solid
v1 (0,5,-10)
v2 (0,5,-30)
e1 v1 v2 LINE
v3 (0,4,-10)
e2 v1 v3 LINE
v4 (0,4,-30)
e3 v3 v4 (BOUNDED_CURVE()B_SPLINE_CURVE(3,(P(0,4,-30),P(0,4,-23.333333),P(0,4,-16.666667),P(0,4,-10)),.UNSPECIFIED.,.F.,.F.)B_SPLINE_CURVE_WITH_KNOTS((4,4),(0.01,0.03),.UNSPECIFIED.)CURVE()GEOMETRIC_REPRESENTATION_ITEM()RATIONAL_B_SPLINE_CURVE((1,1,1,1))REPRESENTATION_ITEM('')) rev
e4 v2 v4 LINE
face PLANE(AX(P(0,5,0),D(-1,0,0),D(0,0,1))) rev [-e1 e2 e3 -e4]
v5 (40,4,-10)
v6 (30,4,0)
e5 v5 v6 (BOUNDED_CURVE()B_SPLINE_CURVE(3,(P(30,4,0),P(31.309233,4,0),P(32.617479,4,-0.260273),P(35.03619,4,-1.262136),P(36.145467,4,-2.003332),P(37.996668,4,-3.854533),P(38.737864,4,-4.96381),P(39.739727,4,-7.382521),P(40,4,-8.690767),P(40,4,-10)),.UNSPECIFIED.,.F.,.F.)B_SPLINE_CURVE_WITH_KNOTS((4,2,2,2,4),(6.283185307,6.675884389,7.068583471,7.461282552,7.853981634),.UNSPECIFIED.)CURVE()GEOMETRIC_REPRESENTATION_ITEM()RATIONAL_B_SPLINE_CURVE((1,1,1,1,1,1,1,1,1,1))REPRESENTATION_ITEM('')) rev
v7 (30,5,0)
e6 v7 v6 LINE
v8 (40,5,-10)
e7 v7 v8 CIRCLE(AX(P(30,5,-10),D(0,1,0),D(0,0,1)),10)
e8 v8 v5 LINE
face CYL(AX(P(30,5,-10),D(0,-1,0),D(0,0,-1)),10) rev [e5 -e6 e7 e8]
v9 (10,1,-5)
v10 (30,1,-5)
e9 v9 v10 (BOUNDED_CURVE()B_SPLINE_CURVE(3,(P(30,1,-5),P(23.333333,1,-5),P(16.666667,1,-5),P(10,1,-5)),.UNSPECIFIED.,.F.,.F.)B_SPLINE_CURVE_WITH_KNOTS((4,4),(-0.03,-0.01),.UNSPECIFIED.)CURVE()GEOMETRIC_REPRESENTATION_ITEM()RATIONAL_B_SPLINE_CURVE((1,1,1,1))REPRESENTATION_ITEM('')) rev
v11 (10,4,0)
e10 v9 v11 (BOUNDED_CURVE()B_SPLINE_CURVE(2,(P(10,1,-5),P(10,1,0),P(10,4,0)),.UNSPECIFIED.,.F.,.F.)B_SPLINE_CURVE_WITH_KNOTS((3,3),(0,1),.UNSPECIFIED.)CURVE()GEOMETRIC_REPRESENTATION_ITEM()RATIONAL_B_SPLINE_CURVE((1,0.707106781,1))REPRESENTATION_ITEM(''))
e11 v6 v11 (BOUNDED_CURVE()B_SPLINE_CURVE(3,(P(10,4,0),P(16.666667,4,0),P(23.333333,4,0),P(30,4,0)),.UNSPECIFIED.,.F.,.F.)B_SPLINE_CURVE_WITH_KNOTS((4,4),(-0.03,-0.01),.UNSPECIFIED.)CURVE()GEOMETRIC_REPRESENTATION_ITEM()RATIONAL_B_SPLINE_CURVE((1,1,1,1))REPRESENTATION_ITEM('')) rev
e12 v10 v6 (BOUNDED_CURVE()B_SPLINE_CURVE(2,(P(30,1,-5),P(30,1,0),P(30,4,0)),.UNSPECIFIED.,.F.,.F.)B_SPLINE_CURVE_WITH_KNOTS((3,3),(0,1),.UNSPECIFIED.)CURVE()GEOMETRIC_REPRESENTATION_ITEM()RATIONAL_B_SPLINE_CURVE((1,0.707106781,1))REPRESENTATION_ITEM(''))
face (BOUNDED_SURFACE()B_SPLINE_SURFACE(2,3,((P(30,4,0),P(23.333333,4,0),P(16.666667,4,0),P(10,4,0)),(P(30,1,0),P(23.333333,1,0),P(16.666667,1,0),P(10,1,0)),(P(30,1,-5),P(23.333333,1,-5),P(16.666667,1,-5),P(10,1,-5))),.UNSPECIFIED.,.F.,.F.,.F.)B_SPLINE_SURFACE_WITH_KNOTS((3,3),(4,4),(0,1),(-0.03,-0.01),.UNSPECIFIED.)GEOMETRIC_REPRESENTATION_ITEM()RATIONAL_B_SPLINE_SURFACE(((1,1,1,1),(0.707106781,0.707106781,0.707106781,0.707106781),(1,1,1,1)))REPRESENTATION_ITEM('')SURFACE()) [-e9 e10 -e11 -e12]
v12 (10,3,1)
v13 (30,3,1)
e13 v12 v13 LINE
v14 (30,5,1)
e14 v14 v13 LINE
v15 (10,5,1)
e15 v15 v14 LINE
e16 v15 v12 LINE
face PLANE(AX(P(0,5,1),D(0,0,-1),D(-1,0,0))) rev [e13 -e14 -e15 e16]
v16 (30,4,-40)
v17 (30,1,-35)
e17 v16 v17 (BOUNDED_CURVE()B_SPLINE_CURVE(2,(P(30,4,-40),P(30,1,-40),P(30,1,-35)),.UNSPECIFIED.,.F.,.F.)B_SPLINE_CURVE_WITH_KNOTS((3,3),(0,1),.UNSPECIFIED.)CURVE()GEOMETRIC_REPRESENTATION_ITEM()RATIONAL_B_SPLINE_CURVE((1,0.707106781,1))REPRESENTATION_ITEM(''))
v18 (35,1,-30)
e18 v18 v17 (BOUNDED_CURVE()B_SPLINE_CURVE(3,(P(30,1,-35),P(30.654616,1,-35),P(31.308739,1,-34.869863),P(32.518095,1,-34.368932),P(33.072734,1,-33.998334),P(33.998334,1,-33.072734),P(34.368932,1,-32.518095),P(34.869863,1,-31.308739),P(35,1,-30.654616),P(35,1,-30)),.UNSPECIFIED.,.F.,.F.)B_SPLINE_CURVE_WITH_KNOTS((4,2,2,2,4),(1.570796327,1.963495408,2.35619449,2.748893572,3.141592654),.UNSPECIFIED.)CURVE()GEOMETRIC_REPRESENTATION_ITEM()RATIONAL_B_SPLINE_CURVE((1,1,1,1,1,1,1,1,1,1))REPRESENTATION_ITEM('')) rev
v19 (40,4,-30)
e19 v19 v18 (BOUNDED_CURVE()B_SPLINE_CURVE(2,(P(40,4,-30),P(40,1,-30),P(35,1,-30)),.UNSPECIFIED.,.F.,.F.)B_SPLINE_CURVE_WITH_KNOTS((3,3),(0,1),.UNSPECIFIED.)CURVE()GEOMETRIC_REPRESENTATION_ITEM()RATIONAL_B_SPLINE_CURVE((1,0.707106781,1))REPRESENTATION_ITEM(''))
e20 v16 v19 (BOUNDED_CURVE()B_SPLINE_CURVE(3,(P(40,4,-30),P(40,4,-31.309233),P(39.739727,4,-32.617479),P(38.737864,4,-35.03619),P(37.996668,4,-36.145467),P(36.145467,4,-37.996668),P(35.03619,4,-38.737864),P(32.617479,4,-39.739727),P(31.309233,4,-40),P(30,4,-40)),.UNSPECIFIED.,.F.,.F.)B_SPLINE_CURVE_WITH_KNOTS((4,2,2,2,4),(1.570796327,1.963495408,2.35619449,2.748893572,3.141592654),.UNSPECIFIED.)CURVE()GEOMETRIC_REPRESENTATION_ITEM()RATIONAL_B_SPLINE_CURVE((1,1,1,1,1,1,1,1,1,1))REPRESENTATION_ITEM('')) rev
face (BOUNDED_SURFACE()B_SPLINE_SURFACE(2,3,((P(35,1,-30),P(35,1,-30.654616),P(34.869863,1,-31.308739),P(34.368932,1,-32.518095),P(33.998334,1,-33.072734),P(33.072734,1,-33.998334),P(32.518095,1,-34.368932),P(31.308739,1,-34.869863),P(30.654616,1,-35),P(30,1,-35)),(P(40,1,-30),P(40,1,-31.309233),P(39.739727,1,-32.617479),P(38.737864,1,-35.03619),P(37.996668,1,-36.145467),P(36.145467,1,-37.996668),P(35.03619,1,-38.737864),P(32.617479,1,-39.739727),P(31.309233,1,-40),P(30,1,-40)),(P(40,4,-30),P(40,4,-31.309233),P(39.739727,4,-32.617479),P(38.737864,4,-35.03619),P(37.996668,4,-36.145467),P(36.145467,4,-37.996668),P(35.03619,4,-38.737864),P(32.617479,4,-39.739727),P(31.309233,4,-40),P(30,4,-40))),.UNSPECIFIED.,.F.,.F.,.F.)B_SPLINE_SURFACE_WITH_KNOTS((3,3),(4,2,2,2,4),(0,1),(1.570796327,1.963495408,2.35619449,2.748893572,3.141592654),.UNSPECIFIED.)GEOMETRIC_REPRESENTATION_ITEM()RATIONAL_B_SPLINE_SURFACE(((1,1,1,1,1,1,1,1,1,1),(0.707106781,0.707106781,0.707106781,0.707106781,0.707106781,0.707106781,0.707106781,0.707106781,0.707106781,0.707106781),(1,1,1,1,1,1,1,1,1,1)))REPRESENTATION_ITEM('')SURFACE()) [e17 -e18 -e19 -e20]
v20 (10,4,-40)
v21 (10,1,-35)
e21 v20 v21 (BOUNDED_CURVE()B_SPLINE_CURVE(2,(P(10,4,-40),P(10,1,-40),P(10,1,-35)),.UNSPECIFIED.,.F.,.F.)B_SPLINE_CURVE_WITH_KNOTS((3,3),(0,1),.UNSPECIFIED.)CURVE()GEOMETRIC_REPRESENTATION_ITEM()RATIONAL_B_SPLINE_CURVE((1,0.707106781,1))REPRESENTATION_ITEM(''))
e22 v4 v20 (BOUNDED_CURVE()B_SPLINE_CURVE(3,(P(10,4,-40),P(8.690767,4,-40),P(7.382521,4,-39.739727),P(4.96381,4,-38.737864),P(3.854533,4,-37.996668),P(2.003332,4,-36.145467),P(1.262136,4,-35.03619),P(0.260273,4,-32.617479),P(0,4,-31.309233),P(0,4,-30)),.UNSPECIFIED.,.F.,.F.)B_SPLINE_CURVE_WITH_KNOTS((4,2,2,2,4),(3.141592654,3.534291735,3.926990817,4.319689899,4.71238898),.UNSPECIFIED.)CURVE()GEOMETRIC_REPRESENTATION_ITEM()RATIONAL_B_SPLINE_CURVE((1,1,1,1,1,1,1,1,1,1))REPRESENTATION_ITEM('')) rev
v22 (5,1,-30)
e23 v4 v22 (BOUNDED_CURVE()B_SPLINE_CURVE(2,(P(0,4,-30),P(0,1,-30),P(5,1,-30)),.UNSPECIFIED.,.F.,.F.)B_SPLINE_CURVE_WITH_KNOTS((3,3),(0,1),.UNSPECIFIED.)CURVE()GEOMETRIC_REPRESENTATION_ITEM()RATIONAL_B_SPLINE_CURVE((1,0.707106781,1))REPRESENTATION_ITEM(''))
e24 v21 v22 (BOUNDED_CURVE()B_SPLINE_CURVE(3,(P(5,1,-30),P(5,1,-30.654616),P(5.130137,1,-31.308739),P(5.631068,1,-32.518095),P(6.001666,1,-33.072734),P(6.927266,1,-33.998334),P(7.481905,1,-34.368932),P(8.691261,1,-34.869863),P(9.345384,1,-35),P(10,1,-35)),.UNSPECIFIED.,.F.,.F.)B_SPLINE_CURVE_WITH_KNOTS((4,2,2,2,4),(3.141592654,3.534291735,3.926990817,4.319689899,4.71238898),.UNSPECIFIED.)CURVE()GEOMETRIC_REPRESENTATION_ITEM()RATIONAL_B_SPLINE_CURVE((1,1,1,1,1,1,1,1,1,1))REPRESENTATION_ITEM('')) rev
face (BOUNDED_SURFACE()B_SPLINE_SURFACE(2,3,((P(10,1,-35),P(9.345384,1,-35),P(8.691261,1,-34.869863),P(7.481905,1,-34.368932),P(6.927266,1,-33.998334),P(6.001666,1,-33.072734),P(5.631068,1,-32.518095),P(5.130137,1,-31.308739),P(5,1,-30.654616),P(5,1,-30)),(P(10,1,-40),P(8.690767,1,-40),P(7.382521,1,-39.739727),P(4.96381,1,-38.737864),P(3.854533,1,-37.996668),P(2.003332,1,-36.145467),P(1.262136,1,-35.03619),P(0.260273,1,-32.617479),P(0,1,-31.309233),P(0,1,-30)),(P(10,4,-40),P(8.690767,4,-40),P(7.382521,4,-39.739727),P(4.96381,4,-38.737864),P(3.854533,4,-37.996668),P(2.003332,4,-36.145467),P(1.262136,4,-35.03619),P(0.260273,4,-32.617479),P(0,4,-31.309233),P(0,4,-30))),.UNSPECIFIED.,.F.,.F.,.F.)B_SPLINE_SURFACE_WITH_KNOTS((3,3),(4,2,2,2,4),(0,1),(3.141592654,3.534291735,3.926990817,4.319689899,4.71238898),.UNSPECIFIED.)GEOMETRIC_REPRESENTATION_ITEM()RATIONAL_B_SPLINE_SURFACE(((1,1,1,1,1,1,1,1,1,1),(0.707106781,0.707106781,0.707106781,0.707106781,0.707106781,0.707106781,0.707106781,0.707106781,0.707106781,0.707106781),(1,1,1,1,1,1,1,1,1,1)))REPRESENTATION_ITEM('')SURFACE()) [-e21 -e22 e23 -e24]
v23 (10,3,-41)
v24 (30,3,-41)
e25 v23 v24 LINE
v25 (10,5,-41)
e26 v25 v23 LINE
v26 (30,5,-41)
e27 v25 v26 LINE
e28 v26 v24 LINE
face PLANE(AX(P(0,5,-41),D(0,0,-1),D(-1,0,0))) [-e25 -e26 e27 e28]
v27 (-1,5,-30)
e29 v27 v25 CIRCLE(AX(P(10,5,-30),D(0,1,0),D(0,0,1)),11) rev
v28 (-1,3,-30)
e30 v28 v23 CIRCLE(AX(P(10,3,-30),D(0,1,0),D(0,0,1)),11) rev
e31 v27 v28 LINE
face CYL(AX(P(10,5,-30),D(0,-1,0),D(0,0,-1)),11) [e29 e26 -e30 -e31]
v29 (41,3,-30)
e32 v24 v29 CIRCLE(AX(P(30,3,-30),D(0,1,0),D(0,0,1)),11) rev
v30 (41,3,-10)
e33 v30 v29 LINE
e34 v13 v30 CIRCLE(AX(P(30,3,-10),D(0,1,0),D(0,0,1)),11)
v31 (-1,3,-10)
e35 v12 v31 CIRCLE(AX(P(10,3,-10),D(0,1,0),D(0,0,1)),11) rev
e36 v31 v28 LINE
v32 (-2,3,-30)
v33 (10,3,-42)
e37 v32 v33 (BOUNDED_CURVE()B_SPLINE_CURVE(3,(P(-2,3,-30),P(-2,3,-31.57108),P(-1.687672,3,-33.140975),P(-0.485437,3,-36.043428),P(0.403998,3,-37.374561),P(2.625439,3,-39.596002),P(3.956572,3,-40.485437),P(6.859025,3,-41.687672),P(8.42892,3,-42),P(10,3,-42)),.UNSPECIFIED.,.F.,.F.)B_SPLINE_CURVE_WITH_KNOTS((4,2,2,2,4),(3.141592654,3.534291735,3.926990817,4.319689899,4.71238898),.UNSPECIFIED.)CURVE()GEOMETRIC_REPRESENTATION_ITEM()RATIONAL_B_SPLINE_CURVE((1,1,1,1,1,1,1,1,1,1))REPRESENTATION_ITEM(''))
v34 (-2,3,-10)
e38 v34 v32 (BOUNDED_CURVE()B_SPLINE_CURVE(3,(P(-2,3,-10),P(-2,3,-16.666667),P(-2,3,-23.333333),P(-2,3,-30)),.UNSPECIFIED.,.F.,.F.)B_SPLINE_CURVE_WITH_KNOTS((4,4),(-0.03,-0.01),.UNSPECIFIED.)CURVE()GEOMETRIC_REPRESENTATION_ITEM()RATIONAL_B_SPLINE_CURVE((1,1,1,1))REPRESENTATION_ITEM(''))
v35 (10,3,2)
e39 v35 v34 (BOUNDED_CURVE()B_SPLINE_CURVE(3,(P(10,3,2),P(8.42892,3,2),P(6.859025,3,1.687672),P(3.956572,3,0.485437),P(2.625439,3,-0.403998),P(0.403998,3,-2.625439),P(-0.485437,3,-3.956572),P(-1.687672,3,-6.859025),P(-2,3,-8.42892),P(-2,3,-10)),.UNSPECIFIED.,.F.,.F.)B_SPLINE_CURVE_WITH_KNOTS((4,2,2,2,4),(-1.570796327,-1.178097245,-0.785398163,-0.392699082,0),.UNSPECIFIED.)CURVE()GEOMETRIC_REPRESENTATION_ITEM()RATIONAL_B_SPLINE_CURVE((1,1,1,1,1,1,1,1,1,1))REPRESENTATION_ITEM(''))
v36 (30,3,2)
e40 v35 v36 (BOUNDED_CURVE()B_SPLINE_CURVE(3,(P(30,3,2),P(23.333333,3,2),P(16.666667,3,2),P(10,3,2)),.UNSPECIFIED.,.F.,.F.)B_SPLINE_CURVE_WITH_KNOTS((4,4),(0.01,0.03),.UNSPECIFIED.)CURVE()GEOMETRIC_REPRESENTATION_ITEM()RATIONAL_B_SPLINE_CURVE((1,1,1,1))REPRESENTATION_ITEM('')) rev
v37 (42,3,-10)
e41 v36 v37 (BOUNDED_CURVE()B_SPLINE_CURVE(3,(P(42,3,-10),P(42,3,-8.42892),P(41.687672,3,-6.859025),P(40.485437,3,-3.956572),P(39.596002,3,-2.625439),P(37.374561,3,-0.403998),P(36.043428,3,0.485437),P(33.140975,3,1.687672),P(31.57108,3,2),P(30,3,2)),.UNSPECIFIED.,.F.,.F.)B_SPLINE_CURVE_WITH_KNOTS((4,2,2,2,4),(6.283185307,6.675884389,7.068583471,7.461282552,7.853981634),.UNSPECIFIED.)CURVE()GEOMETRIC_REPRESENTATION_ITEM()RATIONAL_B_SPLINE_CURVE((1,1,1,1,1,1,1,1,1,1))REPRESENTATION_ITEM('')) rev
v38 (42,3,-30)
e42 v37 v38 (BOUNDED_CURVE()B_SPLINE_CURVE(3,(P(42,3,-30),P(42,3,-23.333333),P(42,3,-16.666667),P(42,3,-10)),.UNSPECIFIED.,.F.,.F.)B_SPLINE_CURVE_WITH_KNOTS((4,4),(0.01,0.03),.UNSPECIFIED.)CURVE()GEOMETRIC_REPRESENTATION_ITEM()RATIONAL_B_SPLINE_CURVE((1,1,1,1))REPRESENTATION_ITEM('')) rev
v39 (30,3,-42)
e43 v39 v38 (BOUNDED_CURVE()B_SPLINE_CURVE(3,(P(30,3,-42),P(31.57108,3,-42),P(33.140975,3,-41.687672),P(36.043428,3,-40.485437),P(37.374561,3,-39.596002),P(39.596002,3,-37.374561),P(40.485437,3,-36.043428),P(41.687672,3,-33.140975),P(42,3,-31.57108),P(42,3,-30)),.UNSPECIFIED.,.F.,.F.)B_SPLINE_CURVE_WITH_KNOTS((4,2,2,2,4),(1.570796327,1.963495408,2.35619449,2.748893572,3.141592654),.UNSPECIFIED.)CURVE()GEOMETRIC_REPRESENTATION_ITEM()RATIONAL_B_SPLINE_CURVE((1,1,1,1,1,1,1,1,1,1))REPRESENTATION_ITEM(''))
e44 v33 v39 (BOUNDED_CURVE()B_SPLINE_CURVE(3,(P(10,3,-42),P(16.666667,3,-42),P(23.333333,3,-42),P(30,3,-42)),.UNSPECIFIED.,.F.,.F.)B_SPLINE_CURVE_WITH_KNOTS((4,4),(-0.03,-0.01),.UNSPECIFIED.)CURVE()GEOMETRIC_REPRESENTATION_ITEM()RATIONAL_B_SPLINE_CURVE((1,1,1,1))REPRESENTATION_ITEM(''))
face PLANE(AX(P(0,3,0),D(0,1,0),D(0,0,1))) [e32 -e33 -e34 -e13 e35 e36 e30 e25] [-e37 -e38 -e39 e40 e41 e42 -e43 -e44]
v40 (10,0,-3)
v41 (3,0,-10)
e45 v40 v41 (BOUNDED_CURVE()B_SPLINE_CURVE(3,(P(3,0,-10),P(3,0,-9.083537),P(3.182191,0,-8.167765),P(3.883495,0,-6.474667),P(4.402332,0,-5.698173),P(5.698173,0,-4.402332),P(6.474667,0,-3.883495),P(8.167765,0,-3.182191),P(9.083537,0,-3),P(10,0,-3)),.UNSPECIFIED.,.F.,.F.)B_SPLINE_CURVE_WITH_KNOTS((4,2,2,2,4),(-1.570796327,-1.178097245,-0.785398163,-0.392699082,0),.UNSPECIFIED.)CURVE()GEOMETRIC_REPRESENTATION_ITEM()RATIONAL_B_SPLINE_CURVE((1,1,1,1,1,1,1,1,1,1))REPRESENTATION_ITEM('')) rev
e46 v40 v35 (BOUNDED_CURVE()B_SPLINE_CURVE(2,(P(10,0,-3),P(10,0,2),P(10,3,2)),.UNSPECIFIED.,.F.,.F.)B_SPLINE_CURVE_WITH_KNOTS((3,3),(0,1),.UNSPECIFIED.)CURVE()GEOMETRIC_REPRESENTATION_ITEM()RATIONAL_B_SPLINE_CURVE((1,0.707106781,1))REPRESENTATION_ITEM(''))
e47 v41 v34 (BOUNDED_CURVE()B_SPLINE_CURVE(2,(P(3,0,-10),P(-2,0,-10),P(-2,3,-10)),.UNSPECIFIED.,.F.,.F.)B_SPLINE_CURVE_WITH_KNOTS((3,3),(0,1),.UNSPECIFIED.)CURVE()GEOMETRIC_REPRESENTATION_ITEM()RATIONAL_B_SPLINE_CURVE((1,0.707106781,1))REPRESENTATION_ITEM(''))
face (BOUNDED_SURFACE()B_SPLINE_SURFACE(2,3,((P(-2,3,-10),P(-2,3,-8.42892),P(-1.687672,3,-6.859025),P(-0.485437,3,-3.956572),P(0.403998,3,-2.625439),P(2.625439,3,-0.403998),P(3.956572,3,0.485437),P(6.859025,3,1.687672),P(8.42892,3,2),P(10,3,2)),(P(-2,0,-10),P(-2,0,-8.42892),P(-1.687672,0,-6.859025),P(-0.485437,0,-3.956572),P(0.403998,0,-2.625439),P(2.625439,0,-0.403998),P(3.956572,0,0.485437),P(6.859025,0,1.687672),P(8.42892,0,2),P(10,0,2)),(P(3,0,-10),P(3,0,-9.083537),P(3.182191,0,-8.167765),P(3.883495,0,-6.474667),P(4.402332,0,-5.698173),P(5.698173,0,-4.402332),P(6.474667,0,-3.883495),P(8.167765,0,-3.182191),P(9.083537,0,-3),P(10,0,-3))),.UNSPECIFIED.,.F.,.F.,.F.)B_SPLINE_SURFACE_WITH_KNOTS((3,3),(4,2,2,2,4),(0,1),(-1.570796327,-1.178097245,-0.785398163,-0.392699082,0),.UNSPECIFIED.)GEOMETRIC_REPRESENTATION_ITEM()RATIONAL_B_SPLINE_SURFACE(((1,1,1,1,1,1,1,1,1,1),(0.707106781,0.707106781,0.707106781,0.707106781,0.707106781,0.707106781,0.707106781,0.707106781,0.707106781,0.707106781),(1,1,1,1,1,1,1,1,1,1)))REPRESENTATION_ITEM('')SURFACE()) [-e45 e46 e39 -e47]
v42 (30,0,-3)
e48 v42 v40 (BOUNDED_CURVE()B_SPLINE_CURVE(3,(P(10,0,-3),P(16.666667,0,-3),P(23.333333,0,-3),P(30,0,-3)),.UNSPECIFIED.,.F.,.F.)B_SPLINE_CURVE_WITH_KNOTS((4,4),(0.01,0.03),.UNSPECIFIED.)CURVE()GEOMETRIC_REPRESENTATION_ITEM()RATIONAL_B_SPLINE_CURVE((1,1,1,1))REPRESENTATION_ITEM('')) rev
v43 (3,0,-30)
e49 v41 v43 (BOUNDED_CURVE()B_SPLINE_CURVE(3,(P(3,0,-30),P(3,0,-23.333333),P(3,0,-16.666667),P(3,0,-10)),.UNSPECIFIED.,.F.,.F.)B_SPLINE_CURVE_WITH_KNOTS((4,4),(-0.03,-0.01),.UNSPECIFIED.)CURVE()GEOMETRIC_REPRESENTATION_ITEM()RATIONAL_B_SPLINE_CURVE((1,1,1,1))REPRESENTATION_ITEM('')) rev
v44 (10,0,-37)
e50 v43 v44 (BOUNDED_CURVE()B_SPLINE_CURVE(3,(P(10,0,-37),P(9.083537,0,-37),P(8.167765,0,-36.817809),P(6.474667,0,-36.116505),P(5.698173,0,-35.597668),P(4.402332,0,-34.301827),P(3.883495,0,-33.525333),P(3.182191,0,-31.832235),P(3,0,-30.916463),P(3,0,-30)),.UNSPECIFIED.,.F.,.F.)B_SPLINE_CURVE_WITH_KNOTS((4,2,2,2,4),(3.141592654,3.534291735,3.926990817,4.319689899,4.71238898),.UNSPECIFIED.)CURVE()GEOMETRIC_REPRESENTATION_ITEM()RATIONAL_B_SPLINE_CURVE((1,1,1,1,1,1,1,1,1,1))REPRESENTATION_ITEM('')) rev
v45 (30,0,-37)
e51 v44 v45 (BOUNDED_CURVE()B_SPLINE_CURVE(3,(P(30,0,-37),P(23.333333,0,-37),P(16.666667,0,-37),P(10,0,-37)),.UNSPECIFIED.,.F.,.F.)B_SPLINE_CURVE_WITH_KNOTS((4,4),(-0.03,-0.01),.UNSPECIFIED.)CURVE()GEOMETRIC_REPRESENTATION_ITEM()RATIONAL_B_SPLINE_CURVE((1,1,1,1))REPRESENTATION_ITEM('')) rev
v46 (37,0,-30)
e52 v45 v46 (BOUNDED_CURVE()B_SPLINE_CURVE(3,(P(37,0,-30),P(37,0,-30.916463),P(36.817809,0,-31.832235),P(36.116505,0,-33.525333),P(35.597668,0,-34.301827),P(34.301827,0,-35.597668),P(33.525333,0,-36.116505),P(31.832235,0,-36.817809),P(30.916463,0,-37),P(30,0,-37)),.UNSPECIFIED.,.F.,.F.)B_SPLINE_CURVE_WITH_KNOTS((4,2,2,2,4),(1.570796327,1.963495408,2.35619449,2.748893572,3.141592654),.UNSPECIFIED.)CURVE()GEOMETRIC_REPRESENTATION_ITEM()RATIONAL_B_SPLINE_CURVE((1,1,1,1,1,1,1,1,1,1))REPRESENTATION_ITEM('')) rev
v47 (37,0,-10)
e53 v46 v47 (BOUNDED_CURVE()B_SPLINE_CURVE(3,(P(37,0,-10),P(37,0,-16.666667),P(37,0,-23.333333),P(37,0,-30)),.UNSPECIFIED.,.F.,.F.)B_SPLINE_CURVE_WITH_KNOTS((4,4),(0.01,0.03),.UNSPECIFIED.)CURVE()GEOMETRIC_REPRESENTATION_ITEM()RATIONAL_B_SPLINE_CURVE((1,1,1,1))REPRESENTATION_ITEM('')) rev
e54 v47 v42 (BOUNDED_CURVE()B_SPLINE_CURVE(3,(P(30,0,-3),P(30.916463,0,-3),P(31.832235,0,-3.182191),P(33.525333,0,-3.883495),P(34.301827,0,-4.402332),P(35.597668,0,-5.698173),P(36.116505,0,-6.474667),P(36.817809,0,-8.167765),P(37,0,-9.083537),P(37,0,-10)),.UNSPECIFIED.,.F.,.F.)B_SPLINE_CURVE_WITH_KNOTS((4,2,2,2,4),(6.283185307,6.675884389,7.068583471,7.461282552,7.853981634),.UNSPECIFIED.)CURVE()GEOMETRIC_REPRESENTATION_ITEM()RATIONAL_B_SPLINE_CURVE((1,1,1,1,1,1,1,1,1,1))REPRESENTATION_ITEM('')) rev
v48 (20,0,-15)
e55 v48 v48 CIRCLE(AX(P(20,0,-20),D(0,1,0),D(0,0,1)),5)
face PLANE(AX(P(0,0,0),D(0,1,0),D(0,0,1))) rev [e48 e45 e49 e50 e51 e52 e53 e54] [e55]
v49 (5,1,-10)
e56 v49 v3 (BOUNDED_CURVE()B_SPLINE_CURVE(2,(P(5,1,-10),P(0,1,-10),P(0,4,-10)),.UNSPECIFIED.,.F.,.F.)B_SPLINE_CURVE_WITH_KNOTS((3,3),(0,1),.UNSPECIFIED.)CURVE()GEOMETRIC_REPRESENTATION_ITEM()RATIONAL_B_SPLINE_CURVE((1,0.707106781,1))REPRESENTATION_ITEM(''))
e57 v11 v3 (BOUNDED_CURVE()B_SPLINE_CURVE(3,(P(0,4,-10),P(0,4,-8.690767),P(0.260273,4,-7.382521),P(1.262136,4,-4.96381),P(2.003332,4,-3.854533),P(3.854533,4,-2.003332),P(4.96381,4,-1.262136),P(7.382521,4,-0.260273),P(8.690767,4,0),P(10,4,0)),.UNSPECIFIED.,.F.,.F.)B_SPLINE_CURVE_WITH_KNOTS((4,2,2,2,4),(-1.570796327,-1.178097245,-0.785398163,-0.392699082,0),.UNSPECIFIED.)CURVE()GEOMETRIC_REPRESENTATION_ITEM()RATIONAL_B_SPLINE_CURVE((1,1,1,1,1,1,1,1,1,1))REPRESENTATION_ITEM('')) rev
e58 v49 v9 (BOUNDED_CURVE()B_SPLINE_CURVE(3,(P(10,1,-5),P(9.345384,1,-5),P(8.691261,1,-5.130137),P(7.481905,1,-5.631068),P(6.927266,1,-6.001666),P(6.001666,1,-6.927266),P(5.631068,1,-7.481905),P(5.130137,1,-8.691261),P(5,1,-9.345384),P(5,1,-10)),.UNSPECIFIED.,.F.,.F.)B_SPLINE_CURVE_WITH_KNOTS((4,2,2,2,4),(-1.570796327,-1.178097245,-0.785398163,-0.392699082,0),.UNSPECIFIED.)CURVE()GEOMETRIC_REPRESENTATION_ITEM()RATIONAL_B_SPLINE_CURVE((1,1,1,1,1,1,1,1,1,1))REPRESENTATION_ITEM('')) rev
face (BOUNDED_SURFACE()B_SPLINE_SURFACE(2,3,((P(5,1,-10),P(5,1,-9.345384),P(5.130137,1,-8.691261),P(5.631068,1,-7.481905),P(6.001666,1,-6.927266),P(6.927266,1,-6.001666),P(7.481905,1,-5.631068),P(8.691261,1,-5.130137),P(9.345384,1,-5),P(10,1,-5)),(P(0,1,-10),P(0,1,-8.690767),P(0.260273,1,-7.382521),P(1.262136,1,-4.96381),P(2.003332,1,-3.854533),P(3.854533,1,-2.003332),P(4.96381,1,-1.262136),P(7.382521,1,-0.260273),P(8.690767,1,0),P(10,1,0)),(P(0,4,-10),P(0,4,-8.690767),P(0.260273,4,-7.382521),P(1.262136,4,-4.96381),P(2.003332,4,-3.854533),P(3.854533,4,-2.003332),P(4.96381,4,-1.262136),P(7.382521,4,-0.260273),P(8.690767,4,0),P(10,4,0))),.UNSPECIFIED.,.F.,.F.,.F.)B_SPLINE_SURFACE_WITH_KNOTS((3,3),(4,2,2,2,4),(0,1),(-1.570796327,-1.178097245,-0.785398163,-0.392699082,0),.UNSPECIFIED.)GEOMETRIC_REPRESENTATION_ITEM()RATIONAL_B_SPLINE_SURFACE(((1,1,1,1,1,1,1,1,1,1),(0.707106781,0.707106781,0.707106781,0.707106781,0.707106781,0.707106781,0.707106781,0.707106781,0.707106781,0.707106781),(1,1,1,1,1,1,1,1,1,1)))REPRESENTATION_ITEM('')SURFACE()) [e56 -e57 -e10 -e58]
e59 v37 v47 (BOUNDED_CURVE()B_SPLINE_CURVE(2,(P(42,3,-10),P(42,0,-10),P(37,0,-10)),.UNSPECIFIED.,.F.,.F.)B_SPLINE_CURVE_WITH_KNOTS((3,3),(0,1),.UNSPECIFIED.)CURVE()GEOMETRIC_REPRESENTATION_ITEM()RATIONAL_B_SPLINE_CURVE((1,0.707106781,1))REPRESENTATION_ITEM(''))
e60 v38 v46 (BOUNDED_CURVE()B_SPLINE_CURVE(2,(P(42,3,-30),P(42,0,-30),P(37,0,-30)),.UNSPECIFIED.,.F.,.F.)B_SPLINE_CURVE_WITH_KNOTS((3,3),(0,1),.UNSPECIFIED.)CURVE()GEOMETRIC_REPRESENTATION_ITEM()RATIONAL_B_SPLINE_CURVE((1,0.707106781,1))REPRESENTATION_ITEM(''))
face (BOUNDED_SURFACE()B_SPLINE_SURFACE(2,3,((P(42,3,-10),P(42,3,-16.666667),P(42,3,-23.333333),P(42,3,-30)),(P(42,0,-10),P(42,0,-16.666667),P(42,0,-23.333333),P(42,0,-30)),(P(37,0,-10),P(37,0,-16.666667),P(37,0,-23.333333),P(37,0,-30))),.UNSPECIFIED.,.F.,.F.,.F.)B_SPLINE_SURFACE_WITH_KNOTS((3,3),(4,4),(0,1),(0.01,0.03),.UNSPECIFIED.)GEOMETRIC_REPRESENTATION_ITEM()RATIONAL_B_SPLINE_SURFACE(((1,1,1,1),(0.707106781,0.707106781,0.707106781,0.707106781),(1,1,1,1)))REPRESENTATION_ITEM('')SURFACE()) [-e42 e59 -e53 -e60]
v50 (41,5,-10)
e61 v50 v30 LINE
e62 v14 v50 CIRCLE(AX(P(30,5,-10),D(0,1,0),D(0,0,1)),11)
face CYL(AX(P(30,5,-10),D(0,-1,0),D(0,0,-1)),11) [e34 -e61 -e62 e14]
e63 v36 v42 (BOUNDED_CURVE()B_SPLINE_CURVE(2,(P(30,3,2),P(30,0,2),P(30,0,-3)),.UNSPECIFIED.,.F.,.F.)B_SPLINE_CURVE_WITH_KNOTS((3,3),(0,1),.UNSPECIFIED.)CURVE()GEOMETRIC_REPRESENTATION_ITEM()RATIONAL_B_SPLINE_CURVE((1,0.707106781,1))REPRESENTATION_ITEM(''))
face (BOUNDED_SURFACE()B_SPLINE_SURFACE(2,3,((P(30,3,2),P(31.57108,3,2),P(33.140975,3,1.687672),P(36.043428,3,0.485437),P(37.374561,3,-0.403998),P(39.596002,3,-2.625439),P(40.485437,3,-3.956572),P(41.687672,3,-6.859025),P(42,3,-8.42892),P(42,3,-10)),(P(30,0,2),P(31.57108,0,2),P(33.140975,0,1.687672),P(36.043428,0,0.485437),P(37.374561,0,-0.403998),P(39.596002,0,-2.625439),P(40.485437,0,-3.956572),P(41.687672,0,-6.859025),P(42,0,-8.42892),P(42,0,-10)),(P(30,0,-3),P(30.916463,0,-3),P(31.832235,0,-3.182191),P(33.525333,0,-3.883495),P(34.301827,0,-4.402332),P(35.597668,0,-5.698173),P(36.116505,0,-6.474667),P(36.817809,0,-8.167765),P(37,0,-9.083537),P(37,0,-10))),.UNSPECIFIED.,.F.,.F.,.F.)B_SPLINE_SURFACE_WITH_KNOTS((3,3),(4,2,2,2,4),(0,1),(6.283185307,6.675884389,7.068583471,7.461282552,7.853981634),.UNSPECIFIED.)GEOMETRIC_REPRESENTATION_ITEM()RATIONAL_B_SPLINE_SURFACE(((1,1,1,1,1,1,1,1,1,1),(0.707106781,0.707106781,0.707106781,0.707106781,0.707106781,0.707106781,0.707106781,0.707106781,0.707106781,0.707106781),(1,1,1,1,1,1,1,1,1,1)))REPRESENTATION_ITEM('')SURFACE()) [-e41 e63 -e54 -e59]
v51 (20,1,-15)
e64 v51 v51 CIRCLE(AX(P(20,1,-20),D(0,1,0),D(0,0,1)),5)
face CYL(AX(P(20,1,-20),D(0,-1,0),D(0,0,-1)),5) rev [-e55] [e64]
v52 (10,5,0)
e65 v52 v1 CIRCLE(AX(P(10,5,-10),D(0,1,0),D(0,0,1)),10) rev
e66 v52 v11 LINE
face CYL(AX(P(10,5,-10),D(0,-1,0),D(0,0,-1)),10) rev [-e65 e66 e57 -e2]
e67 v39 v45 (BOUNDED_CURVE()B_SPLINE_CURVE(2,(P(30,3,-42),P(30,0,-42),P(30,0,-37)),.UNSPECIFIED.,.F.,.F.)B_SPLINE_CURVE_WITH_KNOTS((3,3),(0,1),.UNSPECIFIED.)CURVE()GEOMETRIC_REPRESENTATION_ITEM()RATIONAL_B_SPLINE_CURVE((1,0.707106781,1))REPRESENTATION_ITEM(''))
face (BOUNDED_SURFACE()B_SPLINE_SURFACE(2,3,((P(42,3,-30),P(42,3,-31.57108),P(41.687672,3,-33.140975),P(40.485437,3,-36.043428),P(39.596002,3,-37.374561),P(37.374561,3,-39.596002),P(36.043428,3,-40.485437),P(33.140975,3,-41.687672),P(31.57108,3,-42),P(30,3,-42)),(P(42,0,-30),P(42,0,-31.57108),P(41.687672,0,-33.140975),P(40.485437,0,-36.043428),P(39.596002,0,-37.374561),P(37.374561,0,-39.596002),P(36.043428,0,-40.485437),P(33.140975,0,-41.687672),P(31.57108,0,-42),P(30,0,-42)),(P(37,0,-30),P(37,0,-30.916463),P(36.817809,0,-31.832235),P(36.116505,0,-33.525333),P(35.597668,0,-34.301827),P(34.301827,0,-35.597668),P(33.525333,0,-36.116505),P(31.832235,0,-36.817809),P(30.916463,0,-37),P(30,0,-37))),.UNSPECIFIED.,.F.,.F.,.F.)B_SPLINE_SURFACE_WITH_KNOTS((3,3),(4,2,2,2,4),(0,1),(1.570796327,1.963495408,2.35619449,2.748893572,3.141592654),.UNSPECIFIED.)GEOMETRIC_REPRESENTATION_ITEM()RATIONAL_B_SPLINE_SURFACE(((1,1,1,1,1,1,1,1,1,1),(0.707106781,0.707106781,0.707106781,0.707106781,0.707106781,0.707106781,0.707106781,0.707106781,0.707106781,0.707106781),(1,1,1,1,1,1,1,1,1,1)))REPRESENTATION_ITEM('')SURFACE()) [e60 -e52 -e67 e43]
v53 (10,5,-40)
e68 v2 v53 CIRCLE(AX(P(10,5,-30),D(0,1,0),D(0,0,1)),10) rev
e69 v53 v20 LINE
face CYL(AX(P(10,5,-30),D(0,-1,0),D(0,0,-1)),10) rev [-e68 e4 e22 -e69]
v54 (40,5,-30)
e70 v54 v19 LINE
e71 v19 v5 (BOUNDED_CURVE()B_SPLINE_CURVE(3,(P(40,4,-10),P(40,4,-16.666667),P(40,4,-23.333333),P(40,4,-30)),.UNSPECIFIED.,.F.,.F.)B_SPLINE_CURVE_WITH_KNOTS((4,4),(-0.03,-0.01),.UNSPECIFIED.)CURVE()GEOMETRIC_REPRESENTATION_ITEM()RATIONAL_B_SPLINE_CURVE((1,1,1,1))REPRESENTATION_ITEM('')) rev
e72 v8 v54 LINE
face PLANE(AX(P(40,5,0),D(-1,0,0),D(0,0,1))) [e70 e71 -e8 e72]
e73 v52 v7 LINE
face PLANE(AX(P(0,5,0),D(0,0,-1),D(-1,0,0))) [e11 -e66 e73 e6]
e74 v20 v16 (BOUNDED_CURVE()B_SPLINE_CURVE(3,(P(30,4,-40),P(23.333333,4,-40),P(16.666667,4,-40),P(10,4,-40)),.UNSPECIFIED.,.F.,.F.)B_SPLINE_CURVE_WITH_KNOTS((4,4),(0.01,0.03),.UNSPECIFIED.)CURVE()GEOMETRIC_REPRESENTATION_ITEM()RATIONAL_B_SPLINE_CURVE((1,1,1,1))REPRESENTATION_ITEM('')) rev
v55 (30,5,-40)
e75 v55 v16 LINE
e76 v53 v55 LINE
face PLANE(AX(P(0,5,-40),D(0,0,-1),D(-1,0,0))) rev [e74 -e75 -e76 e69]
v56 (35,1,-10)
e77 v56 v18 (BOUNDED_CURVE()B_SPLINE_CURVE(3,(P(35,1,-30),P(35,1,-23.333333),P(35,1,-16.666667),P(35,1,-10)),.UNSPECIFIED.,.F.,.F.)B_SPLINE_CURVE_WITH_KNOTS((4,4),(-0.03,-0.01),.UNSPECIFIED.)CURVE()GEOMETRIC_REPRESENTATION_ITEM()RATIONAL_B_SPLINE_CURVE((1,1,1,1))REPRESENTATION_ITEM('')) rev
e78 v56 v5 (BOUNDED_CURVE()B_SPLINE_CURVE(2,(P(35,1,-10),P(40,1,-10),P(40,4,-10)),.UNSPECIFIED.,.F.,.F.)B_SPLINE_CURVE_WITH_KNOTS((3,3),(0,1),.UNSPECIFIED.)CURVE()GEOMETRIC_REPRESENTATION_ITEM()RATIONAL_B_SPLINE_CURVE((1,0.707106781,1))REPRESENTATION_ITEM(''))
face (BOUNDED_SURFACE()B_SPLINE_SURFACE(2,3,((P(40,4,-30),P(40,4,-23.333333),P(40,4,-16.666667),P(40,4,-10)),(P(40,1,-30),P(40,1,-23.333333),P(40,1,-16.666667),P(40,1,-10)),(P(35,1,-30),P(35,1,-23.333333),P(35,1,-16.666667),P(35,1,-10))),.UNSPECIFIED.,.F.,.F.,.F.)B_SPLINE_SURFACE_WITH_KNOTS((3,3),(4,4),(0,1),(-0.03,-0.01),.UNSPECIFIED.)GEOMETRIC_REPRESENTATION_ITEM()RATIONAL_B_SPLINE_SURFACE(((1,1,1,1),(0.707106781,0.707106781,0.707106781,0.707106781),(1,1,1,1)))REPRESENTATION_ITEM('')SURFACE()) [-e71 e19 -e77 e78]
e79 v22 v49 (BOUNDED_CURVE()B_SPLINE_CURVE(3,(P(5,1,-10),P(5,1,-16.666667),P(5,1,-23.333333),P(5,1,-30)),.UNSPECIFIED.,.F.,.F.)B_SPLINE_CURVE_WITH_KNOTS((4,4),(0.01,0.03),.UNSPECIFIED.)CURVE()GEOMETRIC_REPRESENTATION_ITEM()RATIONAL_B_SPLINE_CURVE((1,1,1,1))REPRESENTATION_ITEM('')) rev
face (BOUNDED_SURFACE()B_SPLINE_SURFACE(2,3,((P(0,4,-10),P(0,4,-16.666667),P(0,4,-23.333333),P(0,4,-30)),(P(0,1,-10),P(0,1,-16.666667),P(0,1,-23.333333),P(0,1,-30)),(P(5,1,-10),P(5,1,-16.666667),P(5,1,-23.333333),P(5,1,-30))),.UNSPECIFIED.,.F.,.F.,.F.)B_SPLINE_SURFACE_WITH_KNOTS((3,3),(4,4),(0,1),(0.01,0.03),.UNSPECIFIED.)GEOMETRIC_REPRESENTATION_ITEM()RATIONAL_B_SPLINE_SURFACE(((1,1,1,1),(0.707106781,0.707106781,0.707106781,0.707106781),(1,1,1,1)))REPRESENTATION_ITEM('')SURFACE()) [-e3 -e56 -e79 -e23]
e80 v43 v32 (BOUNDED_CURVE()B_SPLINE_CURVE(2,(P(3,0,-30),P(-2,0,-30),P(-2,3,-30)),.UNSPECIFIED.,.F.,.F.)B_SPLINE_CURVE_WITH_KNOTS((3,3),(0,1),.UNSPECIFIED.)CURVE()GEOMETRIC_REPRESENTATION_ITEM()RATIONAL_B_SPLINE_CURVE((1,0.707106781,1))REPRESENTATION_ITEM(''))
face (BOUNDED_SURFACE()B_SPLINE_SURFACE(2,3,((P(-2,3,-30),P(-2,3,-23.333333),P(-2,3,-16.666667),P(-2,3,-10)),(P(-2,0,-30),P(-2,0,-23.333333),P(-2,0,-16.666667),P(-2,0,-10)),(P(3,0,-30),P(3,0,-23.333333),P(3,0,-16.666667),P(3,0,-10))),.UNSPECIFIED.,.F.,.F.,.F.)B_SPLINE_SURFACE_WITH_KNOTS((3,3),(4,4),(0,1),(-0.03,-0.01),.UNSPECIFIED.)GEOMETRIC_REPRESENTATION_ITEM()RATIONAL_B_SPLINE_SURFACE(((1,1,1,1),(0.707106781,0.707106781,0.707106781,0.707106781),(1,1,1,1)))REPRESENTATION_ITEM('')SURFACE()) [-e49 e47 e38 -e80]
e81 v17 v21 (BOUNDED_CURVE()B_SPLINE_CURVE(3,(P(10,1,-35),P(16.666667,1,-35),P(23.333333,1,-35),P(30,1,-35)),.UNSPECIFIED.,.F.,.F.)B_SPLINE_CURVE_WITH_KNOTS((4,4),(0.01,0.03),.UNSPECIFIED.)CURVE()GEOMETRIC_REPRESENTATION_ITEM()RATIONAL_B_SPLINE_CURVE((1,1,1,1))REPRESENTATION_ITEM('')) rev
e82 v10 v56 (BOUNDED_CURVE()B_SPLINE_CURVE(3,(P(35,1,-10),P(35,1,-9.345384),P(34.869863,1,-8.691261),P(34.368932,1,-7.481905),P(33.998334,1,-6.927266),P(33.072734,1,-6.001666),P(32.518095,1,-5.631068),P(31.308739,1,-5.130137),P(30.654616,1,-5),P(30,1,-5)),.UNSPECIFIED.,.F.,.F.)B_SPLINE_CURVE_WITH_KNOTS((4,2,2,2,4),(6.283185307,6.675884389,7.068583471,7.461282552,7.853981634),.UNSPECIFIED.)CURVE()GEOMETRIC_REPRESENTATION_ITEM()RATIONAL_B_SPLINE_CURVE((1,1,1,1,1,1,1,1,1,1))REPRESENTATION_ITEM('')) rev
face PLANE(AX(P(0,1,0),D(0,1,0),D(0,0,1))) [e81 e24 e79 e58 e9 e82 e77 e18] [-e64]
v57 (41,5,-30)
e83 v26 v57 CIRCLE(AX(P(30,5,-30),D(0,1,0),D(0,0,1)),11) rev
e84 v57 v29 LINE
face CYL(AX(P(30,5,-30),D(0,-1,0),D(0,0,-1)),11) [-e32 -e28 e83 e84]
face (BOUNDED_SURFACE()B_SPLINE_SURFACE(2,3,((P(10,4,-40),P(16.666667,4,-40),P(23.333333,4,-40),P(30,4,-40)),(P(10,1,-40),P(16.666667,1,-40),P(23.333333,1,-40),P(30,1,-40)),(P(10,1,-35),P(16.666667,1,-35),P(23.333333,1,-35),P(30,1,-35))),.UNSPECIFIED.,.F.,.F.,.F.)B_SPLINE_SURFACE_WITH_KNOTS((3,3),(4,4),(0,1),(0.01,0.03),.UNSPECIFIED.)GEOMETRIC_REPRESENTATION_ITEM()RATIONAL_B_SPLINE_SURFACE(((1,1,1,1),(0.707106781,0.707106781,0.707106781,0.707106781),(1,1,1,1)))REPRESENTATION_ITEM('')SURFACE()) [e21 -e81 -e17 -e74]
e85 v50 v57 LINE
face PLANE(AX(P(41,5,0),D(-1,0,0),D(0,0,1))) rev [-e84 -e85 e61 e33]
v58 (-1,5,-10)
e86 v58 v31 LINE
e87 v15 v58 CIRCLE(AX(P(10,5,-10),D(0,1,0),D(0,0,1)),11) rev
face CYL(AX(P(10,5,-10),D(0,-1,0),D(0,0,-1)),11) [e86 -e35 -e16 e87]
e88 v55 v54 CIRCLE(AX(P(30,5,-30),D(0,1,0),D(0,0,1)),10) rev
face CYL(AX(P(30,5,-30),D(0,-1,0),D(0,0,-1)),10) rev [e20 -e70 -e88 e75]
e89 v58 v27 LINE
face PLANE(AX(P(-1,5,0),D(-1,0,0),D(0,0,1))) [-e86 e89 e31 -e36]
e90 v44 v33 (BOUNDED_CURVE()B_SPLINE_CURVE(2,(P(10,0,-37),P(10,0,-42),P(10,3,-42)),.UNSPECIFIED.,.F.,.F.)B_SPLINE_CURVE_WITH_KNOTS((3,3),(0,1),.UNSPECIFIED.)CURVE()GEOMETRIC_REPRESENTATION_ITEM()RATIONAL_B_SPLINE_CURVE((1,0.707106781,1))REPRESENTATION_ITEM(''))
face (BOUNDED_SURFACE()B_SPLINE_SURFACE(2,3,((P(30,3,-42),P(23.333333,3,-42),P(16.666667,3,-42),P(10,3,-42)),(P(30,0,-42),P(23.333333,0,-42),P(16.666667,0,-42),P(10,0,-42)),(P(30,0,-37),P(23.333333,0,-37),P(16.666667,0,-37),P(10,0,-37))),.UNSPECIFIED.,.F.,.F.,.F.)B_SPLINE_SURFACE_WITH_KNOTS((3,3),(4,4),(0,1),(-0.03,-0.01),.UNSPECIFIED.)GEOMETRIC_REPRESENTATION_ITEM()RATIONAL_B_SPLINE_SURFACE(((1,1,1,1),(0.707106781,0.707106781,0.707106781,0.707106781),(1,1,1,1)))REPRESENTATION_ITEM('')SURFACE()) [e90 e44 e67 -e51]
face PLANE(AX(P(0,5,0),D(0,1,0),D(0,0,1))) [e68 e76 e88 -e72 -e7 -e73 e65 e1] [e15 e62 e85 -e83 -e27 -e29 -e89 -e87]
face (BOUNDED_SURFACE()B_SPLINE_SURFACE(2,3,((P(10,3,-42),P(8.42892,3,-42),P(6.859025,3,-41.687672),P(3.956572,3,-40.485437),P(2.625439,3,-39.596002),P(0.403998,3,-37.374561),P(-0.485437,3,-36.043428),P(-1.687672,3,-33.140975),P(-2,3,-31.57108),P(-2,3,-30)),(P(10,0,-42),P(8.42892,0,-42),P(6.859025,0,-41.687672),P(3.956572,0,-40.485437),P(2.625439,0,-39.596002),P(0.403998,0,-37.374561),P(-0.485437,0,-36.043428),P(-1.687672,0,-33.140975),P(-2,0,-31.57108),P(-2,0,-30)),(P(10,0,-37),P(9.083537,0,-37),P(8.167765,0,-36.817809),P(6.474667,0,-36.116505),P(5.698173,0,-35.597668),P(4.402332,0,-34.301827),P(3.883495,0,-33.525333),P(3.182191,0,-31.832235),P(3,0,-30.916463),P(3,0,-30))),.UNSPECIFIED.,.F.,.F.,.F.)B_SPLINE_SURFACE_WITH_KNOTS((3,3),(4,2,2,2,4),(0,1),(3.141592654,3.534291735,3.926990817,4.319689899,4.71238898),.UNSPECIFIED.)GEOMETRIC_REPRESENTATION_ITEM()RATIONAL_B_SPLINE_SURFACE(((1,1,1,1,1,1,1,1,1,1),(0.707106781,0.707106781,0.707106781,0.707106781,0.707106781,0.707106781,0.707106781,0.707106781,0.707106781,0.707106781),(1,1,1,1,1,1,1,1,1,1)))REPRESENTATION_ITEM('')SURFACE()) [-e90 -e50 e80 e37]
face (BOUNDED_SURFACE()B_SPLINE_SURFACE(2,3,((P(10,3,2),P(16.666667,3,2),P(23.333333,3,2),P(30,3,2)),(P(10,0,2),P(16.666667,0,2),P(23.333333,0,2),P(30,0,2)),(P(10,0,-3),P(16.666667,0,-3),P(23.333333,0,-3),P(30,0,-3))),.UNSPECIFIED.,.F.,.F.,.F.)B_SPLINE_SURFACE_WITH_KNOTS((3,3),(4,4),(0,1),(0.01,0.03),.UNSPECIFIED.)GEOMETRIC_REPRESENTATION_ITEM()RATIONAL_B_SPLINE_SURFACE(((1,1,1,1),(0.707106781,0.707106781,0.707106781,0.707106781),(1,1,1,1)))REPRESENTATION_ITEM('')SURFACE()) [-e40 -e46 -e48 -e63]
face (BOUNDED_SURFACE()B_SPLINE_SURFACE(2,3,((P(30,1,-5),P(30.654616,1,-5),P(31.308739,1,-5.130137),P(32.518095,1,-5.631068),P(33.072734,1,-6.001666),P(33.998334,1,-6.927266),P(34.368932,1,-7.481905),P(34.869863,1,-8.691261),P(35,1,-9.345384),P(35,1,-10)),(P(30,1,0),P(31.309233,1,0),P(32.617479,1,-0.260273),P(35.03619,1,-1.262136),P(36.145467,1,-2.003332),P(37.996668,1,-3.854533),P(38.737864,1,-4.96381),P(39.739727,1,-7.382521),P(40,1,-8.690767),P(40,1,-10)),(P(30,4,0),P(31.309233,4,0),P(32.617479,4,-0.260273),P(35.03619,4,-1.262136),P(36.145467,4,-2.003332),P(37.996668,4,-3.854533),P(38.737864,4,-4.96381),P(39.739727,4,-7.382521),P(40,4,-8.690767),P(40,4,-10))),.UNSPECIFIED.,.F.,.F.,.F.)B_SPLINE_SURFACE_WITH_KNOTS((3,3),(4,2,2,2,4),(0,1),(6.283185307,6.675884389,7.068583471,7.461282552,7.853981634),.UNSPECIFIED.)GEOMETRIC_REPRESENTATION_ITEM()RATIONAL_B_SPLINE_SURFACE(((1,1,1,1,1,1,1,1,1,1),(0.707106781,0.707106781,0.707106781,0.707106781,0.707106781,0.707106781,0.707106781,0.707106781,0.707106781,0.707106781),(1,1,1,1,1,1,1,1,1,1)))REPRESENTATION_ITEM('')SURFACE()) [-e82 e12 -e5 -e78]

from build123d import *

# Parameters (mm, degrees)
SKETCH1_R           = 5
BOSS_EXTRUDE2_DEPTH = 1
BOSS_EXTRUDE3_DEPTH = 5
BOSS_EXTRUDE4_DEPTH = 3
FILLET1_SIZE        = 5
FILLET1_SIZE_2      = 3
FILLET2_SIZE        = 5
FILLET2_SIZE_2      = 3


with BuildPart() as part:
    # Sketch1 → Boss-Extrude2 (new body)
    with BuildSketch(Plane(origin=(0, 0, 0), x_dir=(1, 0, 0), z_dir=(0, 1, 0))):
        with BuildLine():
            ThreePointArc((10, 0), (2.928932188, 2.928932188), (0, 10))
            Line((0, 10), (0, 30))
            ThreePointArc((0, 30), (2.928932188, 37.071067812), (10, 40))
            Line((10, 40), (30, 40))
            ThreePointArc((30, 40), (37.071067812, 37.071067812), (40, 30))
            Line((40, 30), (40, 10))
            ThreePointArc((40, 10), (37.071067812, 2.928932188), (30, 0))
            Line((30, 0), (10, 0))
        make_face()
        with Locations(Location((20, 20, 0), (0, 0, 270))):
            Circle(SKETCH1_R, mode=Mode.SUBTRACT)
    extrude(amount=BOSS_EXTRUDE2_DEPTH)

    # Sketch1<4> → Boss-Extrude3 (add)
    with BuildSketch(Plane(origin=(0, 0, 0), x_dir=(1, 0, 0), z_dir=(0, 1, 0))):
        with BuildLine():
            ThreePointArc((10, -1), (2.221825407, 2.221825407), (-1, 10))
            Line((-1, 10), (-1, 30))
            ThreePointArc((-1, 30), (2.221825407, 37.778174593), (10, 41))
            Line((10, 41), (30, 41))
            ThreePointArc((30, 41), (37.778174593, 37.778174593), (41, 30))
            Line((41, 30), (41, 10))
            ThreePointArc((41, 10), (37.778174593, 2.221825407), (30, -1))
            Line((30, -1), (10, -1))
        make_face()
        with BuildLine():
            Line((10, 0), (30, 0))
            ThreePointArc((30, 0), (37.071067812, 2.928932188), (40, 10))
            Line((40, 10), (40, 30))
            ThreePointArc((40, 30), (37.071067812, 37.071067812), (30, 40))
            Line((30, 40), (10, 40))
            ThreePointArc((10, 40), (2.928932188, 37.071067812), (0, 30))
            Line((0, 30), (0, 10))
            ThreePointArc((0, 10), (2.928932188, 2.928932188), (10, 0))
        make_face(mode=Mode.SUBTRACT)
    extrude(amount=BOSS_EXTRUDE3_DEPTH)

    # Sketch1<5> → Boss-Extrude4 (add)
    with BuildSketch(Plane(origin=(0, 0, 0), x_dir=(1, 0, 0), z_dir=(0, 1, 0))):
        with BuildLine():
            ThreePointArc((10, -2), (1.514718626, 1.514718626), (-2, 10))
            Line((-2, 10), (-2, 30))
            ThreePointArc((-2, 30), (1.514718626, 38.485281374), (10, 42))
            Line((10, 42), (30, 42))
            ThreePointArc((30, 42), (38.485281374, 38.485281374), (42, 30))
            Line((42, 30), (42, 10))
            ThreePointArc((42, 10), (38.485281374, 1.514718626), (30, -2))
            Line((30, -2), (10, -2))
        make_face()
        with BuildLine():
            Line((10, -1), (30, -1))
            ThreePointArc((30, -1), (37.778174593, 2.221825407), (41, 10))
            Line((41, 10), (41, 30))
            ThreePointArc((41, 30), (37.778174593, 37.778174593), (30, 41))
            Line((30, 41), (10, 41))
            ThreePointArc((10, 41), (2.221825407, 37.778174593), (-1, 30))
            Line((-1, 30), (-1, 10))
            ThreePointArc((-1, 10), (2.221825407, 2.221825407), (10, -1))
        make_face(mode=Mode.SUBTRACT)
    extrude(amount=BOSS_EXTRUDE4_DEPTH)

    # Fillet1
    # an asymmetric fillet: 5, 3 mm, written as the material it adds along each edge
    with BuildSketch(Plane(origin=(10, 1, -10), x_dir=(0, 0, 1), z_dir=(1, 0, 0))) as fillet1_piece_1:
        with BuildLine():
            Bezier((10 - FILLET1_SIZE, 0), (10, 0), (10, -FILLET1_SIZE_2), weights=[1, 0.707106781, 1])
            Line((10, -FILLET1_SIZE_2), (10, 0))
            Line((10, 0), (10 - FILLET1_SIZE, 0))
        make_face()
    revolve(axis=Axis((10, 1, -10), (0, -1, 0)), revolution_arc=90)
    with BuildSketch(Plane(origin=(30, 1, 0), x_dir=(0, 0, -1), z_dir=(-1, 0, 0)), Plane(origin=(40, 1, -30), x_dir=(-1, 0, 0), z_dir=(0, 0, 1)), Plane(origin=(10, 1, -40), x_dir=(0, 0, 1), z_dir=(1, 0, 0)), Plane(origin=(0, 1, -10), x_dir=(1, 0, 0), z_dir=(0, 0, -1))) as fillet1_piece_2:
        with BuildLine():
            Bezier((FILLET1_SIZE, 0), (0, 0), (0, -FILLET1_SIZE_2), weights=[1, 0.707106781, 1])
            Line((0, -FILLET1_SIZE_2), (0, 0))
            Line((0, 0), (FILLET1_SIZE, 0))
        make_face()
    extrude(amount=20)
    with BuildSketch(Plane(origin=(30, 1, -10), x_dir=(1, 0, 0), z_dir=(0, 0, -1))) as fillet1_piece_3:
        with BuildLine():
            Bezier((10 - FILLET1_SIZE, 0), (10, 0), (10, -FILLET1_SIZE_2), weights=[1, 0.707106781, 1])
            Line((10, -FILLET1_SIZE_2), (10, 0))
            Line((10, 0), (10 - FILLET1_SIZE, 0))
        make_face()
    revolve(axis=Axis((30, 1, -10), (0, -1, 0)), revolution_arc=90)
    with BuildSketch(Plane(origin=(30, 1, -30), x_dir=(0, 0, -1), z_dir=(-1, 0, 0))) as fillet1_piece_4:
        with BuildLine():
            Bezier((10 - FILLET1_SIZE, 0), (10, 0), (10, -FILLET1_SIZE_2), weights=[1, 0.707106781, 1])
            Line((10, -FILLET1_SIZE_2), (10, 0))
            Line((10, 0), (10 - FILLET1_SIZE, 0))
        make_face()
    revolve(axis=Axis((30, 1, -30), (0, -1, 0)), revolution_arc=90)
    with BuildSketch(Plane(origin=(10, 1, -30), x_dir=(-1, 0, 0), z_dir=(0, 0, 1))) as fillet1_piece_5:
        with BuildLine():
            Bezier((10 - FILLET1_SIZE, 0), (10, 0), (10, -FILLET1_SIZE_2), weights=[1, 0.707106781, 1])
            Line((10, -FILLET1_SIZE_2), (10, 0))
            Line((10, 0), (10 - FILLET1_SIZE, 0))
        make_face()
    revolve(axis=Axis((10, 1, -30), (0, -1, 0)), revolution_arc=90)

    # Fillet2
    # an asymmetric fillet: 5, 3 mm, written as the material it takes off along each edge
    with BuildSketch(Plane(origin=(10, 0, -42), x_dir=(0, 0, 1), z_dir=(1, 0, 0)), Plane(origin=(-2, 0, -10), x_dir=(1, 0, 0), z_dir=(0, 0, -1)), Plane(origin=(42, 0, -30), x_dir=(-1, 0, 0), z_dir=(0, 0, 1)), Plane(origin=(30, 0, 2), x_dir=(0, 0, -1), z_dir=(-1, 0, 0))) as fillet2_piece_1:
        with BuildLine():
            Bezier((FILLET2_SIZE, 0), (0, 0), (0, -FILLET2_SIZE_2), weights=[1, 0.707106781, 1])
            Line((0, -FILLET2_SIZE_2), (-0.1, -3))
            Line((-0.1, -3), (-0.1, 0.1))
            Line((-0.1, 0.1), (5, 0.1))
            Line((5, 0.1), (FILLET2_SIZE, 0))
        make_face()
    extrude(amount=20, mode=Mode.SUBTRACT)
    with BuildSketch(Plane(origin=(10, 0, -30), x_dir=(-1, 0, 0), z_dir=(0, 0, 1))) as fillet2_piece_2:
        with BuildLine():
            Bezier((12 - FILLET2_SIZE, 0), (12, 0), (12, -FILLET2_SIZE_2), weights=[1, 0.707106781, 1])
            Line((12, -FILLET2_SIZE_2), (12.1, -3))
            Line((12.1, -3), (12.1, 0.1))
            Line((12.1, 0.1), (7, 0.1))
            Line((7, 0.1), (12 - FILLET2_SIZE, 0))
        make_face()
    revolve(axis=Axis((10, 0, -30), (0, -1, 0)), revolution_arc=90, mode=Mode.SUBTRACT)
    with BuildSketch(Plane(origin=(30, 0, -30), x_dir=(0, 0, -1), z_dir=(-1, 0, 0))) as fillet2_piece_3:
        with BuildLine():
            Bezier((12 - FILLET2_SIZE, 0), (12, 0), (12, -FILLET2_SIZE_2), weights=[1, 0.707106781, 1])
            Line((12, -FILLET2_SIZE_2), (12.1, -3))
            Line((12.1, -3), (12.1, 0.1))
            Line((12.1, 0.1), (7, 0.1))
            Line((7, 0.1), (12 - FILLET2_SIZE, 0))
        make_face()
    revolve(axis=Axis((30, 0, -30), (0, -1, 0)), revolution_arc=90, mode=Mode.SUBTRACT)
    with BuildSketch(Plane(origin=(10, 0, -10), x_dir=(0, 0, 1), z_dir=(1, 0, 0))) as fillet2_piece_4:
        with BuildLine():
            Bezier((12 - FILLET2_SIZE, 0), (12, 0), (12, -FILLET2_SIZE_2), weights=[1, 0.707106781, 1])
            Line((12, -FILLET2_SIZE_2), (12.1, -3))
            Line((12.1, -3), (12.1, 0.1))
            Line((12.1, 0.1), (7, 0.1))
            Line((7, 0.1), (12 - FILLET2_SIZE, 0))
        make_face()
    revolve(axis=Axis((10, 0, -10), (0, -1, 0)), revolution_arc=90, mode=Mode.SUBTRACT)
    with BuildSketch(Plane(origin=(30, 0, -10), x_dir=(1, 0, 0), z_dir=(0, 0, -1))) as fillet2_piece_5:
        with BuildLine():
            Bezier((12 - FILLET2_SIZE, 0), (12, 0), (12, -FILLET2_SIZE_2), weights=[1, 0.707106781, 1])
            Line((12, -FILLET2_SIZE_2), (12.1, -3))
            Line((12.1, -3), (12.1, 0.1))
            Line((12.1, 0.1), (7, 0.1))
            Line((7, 0.1), (12 - FILLET2_SIZE, 0))
        make_face()
    revolve(axis=Axis((30, 0, -10), (0, -1, 0)), revolution_arc=90, mode=Mode.SUBTRACT)


solid = part.part
